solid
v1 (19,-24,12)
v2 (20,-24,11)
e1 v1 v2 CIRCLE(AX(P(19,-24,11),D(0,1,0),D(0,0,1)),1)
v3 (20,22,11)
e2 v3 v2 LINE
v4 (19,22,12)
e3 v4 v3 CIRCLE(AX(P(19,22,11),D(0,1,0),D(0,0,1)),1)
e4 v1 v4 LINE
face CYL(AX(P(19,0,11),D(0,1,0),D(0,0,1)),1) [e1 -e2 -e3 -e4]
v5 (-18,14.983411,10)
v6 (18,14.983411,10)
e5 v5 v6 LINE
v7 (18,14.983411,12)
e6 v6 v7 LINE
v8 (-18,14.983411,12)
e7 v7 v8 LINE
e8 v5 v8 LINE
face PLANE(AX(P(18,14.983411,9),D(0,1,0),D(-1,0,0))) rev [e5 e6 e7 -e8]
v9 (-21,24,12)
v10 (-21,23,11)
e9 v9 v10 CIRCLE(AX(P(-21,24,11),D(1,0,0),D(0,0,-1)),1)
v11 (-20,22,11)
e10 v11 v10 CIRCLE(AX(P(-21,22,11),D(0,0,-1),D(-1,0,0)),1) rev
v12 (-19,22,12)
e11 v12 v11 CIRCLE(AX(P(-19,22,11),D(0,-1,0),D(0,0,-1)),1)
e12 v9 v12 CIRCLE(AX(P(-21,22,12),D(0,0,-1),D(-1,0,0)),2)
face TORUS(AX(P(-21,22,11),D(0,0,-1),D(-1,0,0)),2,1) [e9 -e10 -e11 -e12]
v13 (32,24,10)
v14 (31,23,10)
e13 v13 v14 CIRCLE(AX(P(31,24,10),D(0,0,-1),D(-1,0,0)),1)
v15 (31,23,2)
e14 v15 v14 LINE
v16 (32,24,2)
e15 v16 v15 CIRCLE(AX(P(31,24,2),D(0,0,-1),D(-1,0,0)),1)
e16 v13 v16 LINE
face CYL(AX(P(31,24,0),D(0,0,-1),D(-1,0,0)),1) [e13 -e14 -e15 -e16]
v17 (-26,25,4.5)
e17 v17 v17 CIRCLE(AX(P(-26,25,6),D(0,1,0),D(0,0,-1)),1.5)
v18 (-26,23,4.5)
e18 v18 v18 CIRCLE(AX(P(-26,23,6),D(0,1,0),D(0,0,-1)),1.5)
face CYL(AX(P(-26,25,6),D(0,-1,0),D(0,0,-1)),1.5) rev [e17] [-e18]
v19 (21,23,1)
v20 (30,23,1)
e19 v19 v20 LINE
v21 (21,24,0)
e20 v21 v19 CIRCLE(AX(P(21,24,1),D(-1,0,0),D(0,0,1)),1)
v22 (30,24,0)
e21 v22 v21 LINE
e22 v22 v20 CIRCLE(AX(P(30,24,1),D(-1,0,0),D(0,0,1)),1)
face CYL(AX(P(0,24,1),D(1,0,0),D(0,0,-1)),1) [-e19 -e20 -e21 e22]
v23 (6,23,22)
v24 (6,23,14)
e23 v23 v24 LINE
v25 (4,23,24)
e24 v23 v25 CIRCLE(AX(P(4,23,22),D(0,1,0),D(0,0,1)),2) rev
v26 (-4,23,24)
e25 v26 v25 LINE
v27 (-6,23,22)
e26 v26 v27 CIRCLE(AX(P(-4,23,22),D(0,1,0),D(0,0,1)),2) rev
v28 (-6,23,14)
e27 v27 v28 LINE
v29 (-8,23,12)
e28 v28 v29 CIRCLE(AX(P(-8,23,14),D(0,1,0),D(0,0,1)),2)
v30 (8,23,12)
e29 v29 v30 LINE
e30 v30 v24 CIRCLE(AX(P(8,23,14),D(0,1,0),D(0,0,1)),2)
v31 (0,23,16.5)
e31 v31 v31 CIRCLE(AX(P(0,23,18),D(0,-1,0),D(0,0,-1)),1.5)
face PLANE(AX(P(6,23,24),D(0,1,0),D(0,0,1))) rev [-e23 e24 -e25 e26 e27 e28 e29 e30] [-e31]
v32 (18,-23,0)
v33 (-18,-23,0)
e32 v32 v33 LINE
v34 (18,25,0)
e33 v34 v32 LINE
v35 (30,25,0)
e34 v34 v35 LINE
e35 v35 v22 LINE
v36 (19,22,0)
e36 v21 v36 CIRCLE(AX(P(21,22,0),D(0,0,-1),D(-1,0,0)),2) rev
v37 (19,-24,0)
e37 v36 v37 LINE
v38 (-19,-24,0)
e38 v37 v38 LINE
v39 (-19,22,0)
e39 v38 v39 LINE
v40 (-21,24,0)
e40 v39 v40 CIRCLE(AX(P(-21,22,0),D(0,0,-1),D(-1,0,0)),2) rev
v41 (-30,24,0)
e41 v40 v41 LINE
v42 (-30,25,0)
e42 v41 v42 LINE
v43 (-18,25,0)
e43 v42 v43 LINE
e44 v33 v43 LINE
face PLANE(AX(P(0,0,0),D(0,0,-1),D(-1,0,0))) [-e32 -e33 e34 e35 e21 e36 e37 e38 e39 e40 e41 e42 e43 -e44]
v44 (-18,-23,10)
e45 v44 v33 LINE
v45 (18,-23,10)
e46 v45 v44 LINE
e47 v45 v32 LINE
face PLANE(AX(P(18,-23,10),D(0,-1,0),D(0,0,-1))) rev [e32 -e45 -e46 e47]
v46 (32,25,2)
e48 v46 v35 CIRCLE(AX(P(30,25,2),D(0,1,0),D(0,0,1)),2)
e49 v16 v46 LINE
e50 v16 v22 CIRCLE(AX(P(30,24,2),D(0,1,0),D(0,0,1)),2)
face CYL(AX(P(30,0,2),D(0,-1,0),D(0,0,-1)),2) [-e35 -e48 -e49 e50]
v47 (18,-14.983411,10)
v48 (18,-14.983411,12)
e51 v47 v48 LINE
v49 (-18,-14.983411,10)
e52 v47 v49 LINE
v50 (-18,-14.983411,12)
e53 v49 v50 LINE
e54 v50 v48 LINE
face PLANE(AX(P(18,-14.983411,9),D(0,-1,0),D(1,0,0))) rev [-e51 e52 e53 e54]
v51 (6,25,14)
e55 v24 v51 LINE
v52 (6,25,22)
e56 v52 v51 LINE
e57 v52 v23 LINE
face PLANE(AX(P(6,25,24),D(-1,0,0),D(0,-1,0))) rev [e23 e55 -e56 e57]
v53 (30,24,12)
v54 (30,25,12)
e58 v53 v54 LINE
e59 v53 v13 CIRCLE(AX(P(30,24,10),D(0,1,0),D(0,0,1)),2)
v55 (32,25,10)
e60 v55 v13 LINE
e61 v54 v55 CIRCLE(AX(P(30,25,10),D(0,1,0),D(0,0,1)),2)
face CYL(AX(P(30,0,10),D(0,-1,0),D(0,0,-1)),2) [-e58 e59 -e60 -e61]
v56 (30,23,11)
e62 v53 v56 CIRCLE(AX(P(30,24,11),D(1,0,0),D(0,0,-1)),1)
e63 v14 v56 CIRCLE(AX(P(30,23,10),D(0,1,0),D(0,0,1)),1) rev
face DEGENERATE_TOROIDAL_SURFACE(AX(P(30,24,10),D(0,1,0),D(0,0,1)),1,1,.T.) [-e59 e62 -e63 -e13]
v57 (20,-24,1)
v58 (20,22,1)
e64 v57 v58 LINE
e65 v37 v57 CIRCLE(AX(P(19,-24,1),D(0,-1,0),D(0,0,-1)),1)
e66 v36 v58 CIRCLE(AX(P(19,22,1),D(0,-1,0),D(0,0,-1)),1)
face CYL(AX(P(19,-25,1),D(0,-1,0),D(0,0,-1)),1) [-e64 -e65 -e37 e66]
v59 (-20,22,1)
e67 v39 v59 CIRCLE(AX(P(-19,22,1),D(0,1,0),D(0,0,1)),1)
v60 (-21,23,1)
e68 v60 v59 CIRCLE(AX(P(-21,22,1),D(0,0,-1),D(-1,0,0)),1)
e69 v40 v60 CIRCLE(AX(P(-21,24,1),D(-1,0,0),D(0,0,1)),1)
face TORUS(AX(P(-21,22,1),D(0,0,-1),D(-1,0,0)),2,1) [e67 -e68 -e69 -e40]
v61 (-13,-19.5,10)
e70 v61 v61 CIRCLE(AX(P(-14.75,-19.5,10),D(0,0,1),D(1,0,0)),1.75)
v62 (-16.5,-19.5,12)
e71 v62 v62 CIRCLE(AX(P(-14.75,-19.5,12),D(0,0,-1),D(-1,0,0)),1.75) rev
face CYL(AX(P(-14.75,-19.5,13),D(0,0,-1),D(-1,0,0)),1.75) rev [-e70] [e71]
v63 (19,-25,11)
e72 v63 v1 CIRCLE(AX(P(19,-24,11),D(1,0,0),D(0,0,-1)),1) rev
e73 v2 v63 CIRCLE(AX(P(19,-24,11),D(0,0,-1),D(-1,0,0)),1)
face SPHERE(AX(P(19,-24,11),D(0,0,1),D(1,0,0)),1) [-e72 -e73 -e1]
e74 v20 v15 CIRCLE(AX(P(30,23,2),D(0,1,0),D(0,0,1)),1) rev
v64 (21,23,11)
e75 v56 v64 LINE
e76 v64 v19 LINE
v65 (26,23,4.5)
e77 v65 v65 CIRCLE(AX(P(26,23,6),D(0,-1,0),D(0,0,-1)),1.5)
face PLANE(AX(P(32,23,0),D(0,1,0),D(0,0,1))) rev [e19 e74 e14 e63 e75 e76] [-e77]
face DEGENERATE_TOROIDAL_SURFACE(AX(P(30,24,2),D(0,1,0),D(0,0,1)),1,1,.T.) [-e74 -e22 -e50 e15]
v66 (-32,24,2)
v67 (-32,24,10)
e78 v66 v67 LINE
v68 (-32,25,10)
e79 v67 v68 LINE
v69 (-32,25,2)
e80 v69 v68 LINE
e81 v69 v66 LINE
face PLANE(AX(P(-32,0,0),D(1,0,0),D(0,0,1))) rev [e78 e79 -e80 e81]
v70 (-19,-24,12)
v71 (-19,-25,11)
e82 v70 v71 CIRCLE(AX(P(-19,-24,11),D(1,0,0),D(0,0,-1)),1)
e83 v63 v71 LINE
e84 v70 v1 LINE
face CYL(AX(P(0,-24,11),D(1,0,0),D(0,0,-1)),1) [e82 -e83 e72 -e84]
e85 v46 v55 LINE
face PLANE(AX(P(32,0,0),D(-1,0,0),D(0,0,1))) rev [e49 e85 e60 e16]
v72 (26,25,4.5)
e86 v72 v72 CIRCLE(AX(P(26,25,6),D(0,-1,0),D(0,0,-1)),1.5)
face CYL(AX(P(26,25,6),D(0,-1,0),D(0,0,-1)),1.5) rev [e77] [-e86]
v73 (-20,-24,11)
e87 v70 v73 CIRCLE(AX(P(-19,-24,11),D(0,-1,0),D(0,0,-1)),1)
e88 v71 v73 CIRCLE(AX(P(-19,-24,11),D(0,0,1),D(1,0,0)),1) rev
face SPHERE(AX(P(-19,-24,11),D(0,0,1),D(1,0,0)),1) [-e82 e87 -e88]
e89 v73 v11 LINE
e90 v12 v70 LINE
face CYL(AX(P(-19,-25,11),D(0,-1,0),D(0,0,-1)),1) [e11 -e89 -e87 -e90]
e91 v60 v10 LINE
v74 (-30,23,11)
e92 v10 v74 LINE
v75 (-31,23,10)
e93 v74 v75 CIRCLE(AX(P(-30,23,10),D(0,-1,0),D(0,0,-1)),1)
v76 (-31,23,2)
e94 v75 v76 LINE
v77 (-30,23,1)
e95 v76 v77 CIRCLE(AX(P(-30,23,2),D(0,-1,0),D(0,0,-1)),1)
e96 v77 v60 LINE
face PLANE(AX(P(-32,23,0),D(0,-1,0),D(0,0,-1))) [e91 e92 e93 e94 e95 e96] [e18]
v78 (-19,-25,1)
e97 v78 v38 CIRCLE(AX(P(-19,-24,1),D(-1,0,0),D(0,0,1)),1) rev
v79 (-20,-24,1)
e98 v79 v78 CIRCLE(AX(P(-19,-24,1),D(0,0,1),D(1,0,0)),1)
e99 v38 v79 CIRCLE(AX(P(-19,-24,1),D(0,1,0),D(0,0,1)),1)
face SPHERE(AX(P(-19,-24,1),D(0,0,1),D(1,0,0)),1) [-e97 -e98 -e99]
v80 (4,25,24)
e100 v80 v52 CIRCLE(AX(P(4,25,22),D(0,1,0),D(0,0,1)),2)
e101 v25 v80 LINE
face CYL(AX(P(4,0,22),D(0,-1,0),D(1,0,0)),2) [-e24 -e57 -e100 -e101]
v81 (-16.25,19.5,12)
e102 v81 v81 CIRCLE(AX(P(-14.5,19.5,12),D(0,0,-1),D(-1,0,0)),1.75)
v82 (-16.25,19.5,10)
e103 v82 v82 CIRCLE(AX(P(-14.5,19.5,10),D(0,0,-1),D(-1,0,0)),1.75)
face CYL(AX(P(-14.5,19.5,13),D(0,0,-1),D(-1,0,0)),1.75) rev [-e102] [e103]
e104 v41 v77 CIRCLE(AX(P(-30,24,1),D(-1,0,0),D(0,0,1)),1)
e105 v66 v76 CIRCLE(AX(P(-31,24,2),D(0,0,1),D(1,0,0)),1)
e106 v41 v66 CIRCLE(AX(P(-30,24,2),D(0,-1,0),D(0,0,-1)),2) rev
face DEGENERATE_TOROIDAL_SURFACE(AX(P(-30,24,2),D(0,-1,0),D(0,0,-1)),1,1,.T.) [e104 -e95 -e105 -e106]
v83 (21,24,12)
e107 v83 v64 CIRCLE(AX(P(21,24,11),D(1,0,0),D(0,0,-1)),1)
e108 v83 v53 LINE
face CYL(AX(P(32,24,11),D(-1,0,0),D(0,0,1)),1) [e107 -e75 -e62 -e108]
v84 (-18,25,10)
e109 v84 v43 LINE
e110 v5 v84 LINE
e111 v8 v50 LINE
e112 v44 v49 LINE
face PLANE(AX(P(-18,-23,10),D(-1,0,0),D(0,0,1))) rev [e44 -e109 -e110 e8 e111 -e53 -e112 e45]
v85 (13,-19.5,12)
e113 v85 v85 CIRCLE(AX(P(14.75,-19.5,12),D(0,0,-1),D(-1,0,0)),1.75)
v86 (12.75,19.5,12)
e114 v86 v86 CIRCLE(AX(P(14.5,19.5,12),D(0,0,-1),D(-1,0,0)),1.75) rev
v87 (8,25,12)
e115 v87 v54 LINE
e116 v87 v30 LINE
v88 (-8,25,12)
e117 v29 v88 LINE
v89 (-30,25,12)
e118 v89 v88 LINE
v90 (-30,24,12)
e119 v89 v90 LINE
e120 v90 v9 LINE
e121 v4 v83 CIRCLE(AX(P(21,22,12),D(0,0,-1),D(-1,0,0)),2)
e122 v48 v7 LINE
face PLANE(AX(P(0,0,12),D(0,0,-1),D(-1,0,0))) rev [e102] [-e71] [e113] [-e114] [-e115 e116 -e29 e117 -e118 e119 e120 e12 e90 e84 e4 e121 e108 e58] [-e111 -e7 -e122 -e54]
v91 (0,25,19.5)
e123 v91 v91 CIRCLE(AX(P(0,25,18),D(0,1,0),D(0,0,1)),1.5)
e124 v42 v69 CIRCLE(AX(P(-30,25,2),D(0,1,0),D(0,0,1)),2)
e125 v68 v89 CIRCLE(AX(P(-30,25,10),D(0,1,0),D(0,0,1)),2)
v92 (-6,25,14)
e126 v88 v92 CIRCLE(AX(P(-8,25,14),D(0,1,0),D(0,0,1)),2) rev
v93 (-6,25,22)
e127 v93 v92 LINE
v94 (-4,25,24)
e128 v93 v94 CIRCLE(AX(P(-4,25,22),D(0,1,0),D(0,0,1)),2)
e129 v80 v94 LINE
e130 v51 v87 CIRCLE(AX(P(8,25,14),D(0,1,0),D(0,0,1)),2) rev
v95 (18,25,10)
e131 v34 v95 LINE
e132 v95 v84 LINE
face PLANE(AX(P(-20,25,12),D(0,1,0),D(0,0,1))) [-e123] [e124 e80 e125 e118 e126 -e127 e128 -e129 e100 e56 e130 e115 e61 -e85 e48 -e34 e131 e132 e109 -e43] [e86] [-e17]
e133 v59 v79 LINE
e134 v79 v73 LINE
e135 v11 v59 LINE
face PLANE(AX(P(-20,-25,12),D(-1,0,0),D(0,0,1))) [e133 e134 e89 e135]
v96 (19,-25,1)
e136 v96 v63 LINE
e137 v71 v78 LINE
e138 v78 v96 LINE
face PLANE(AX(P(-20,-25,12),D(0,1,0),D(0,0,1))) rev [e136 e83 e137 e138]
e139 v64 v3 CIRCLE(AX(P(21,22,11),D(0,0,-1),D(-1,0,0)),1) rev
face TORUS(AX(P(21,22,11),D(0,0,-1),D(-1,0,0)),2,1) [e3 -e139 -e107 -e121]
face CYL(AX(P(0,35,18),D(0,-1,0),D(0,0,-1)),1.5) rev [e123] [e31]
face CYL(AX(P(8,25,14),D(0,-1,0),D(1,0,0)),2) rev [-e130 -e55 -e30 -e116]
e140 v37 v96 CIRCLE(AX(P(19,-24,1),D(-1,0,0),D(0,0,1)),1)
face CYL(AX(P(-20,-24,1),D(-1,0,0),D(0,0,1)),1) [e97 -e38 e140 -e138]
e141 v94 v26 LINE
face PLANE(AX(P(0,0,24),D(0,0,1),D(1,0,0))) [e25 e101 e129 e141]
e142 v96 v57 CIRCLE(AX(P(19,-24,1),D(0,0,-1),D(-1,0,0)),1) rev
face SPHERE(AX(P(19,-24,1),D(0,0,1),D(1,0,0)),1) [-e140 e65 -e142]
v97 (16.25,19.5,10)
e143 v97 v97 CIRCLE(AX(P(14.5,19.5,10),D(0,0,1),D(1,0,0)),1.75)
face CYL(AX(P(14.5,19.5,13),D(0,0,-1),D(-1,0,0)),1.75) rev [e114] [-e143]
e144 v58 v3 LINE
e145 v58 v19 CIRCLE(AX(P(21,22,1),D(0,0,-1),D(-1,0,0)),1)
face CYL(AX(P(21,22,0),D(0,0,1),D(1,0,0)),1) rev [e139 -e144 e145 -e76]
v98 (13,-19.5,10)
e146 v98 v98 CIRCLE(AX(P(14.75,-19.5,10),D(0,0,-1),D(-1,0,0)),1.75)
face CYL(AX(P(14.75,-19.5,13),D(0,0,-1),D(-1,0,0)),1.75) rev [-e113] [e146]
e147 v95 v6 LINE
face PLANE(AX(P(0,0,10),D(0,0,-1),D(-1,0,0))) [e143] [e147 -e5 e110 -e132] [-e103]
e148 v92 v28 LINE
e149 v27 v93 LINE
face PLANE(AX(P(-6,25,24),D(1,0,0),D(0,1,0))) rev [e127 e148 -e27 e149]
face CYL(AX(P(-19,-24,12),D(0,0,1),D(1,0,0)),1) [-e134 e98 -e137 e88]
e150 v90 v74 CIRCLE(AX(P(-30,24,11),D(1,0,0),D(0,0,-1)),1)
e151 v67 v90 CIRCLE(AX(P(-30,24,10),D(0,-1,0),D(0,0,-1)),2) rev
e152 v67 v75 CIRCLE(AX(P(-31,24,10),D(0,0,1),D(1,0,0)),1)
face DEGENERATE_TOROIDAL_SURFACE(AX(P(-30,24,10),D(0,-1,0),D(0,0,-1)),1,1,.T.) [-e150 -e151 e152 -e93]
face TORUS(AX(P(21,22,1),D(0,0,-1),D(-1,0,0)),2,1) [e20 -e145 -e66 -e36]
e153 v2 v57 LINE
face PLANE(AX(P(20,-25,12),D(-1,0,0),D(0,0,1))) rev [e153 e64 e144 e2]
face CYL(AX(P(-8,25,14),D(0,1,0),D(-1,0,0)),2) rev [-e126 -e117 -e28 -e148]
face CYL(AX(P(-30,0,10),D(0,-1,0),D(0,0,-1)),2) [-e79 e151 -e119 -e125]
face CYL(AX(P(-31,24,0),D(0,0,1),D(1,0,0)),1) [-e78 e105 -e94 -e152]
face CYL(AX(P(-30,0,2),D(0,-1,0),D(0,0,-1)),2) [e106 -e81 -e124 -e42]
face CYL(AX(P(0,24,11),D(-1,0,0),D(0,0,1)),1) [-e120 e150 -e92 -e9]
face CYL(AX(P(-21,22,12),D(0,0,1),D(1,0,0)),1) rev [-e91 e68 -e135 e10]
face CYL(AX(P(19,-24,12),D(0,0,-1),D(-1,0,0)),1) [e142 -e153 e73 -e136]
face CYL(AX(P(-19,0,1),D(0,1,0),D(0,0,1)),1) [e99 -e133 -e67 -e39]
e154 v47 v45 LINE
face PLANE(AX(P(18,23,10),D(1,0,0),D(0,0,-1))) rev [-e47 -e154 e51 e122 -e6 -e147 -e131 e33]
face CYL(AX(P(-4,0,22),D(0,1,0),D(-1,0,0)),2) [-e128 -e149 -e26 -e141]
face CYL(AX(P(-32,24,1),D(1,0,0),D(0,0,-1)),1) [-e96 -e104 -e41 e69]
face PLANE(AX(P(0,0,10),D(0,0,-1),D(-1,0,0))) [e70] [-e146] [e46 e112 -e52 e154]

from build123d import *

# Parameters (mm, degrees)
SKETCH_3_W           = 40
SKETCH_3_H           = 50
EXTRUDE_1_DEPTH      = 12
SKETCH_5_W           = 36
SKETCH_5_H           = 46
CUT_EXTRUDE_2_DEPTH  = 10
SKETCH_7_R           = 1.75
CUT_EXTRUDE_6_DEPTH  = 3
SKETCH_11_W          = 12
SKETCH_11_H          = 2
EXTRUDE_2_DEPTH      = 12
FILLET_1_R           = 2
SKETCH_13_R          = 1.5
CUT_EXTRUDE_7_DEPTH  = 2
FILLET_4_R           = 2
SKETCH_14_W          = 12
SKETCH_14_H          = 2
EXTRUDE_3_DEPTH      = 12
FILLET_5_R           = 2
SKETCH_15_R          = 1.5
CUT_EXTRUDE_8_DEPTH  = 12
FILLET_6_R           = 1
FILLET_7_R           = 1
SKETCH_16_W          = 36
SKETCH_16_H          = 10
CUT_EXTRUDE_9_DEPTH  = 63.481997407
SKETCH_19_W          = 36
SKETCH_19_H          = 29.966821032
CUT_EXTRUDE_10_DEPTH = 3


with BuildPart() as part:
    # 草图3 → 凸台-拉伸1 (new body)
    with BuildSketch(Plane.XY):
        Rectangle(SKETCH_3_W, SKETCH_3_H)
    extrude(amount=EXTRUDE_1_DEPTH)

    # 草图5 → 切除-拉伸2 (cut)
    with BuildSketch(Plane(origin=(0, 0, 0), x_dir=(-1, 0, 0), z_dir=(0, 0, -1))):
        Rectangle(SKETCH_5_W, SKETCH_5_H)
    extrude(amount=-CUT_EXTRUDE_2_DEPTH, mode=Mode.SUBTRACT)

    # 草图7 → 切除-拉伸6 (cut)
    with BuildSketch(Plane(origin=(0, 0, 10), x_dir=(-1, 0, 0), z_dir=(0, 0, -1))):
        with Locations((14.5, 19.5)):
            Circle(SKETCH_7_R)
        with Locations((14.75, -19.5)):
            Circle(SKETCH_7_R)
        with Locations((-14.75, -19.5)):
            Circle(SKETCH_7_R)
        with Locations((-14.5, 19.5)):
            Circle(SKETCH_7_R)
    extrude(amount=-CUT_EXTRUDE_6_DEPTH, mode=Mode.SUBTRACT)

    # 草图11 → 凸台-拉伸2 (add)
    with BuildSketch(Plane(origin=(20, 0, 0), x_dir=(0, 0, -1), z_dir=(1, 0, 0))):
        with Locations((-6, 24)):
            Rectangle(SKETCH_11_W, SKETCH_11_H)
    extrude_2 = extrude(amount=EXTRUDE_2_DEPTH)

    # 圆角1
    fillet_1_edges = [part.edges().sort_by_distance(p)[0] for p in [
        (32, 24, 0),
        (32, 24, 12),
    ]]
    fillet(fillet_1_edges, radius=FILLET_1_R)

    # 草图13 → 切除-拉伸7 (cut)
    with BuildSketch(Plane.XZ.offset(-23)):
        with Locations(Location((26, 6, 0), (0, 0, 270))):
            Circle(SKETCH_13_R)
    cut_extrude_7 = extrude(amount=-CUT_EXTRUDE_7_DEPTH, mode=Mode.SUBTRACT)

    # 镜向1: 凸台-拉伸2, 切除-拉伸7 across plane
    add(extrude_2.mirror(Plane(origin=(0, 0, 0), x_dir=(0, 0, 1), z_dir=(1, 0, 0))))
    add(cut_extrude_7.mirror(Plane(origin=(0, 0, 0), x_dir=(0, 0, 1), z_dir=(1, 0, 0))), mode=Mode.SUBTRACT)

    # 圆角4
    fillet_4_edges = [part.edges().sort_by_distance(p)[0] for p in [
        (-32, 24, 0),
        (-32, 24, 12),
    ]]
    fillet(fillet_4_edges, radius=FILLET_4_R)

    # 草图14 → 凸台-拉伸3 (add)
    with BuildSketch(Plane.XY.offset(12)):
        with Locations((0, 24)):
            Rectangle(SKETCH_14_W, SKETCH_14_H)
    extrude(amount=EXTRUDE_3_DEPTH)

    # 圆角5
    fillet_5_edges = [part.edges().sort_by_distance(p)[0] for p in [
        (6, 24, 12),
        (-6, 24, 12),
        (6, 24, 24),
        (-6, 24, 24),
    ]]
    fillet(fillet_5_edges, radius=FILLET_5_R)

    # 草图15 → 切除-拉伸8 (cut)
    with BuildSketch(Plane.XZ.offset(-23)):
        with Locations(Location((0, 18, 0), (0, 0, 270))):
            Circle(SKETCH_15_R)
    extrude(amount=-CUT_EXTRUDE_8_DEPTH, mode=Mode.SUBTRACT)

    # 圆角6
    fillet_6_edges = [part.edges().sort_by_distance(p)[0] for p in [
        (0, -25, 12),
        (0, -25, 0),
        (20, 23, 6),
        (-20, -25, 6),
        (20, -25, 6),
        (-20, 23, 6),
    ]]
    fillet(fillet_6_edges, radius=FILLET_6_R)

    # 圆角7
    # the kernel refuses this fillet: 1 mm, written as the material it takes off along each edge
    with BuildSketch(Plane(origin=(19, -24, 11), x_dir=(1, 0, 0), z_dir=(0, 0, 1))) as fillet_7_piece_1_section:
        Polygon((0, 0), (FILLET_7_R, 0), (FILLET_7_R, -FILLET_7_R), (0, -FILLET_7_R), align=None)
    fillet_7_piece_1 = extrude(amount=FILLET_7_R, mode=Mode.PRIVATE)
    fillet_7_piece_1 = fillet_7_piece_1 - Plane(origin=(19, -24, 11), x_dir=(-0.7071067811865475, 0.7071067811865475, 0), z_dir=(0, 0, 1)) * Sphere(FILLET_7_R, mode=Mode.PRIVATE)
    add(fillet_7_piece_1, mode=Mode.SUBTRACT)
    with BuildSketch(Plane(origin=(19, -24, 1), x_dir=(0, 0, -1), z_dir=(1, 0, 0))) as fillet_7_piece_2_section:
        Polygon((0, 0), (FILLET_7_R, 0), (FILLET_7_R, -FILLET_7_R), (0, -FILLET_7_R), align=None)
    fillet_7_piece_2 = extrude(amount=FILLET_7_R, mode=Mode.PRIVATE)
    fillet_7_piece_2 = fillet_7_piece_2 - Plane(origin=(19, -24, 1), x_dir=(0, 0.7071067811865475, 0.7071067811865475), z_dir=(1, 0, 0)) * Sphere(FILLET_7_R, mode=Mode.PRIVATE)
    add(fillet_7_piece_2, mode=Mode.SUBTRACT)
    with BuildSketch(Plane(origin=(-19, -24, 11), x_dir=(-1, 0, 0), z_dir=(0, 0, 1))) as fillet_7_piece_3_section:
        Polygon((0, 0), (FILLET_7_R, 0), (FILLET_7_R, FILLET_7_R), (0, FILLET_7_R), align=None)
    fillet_7_piece_3 = extrude(amount=FILLET_7_R, mode=Mode.PRIVATE)
    fillet_7_piece_3 = fillet_7_piece_3 - Plane(origin=(-19, -24, 11), x_dir=(0.7071067811865475, 0.7071067811865475, 0), z_dir=(0, 0, 1)) * Sphere(FILLET_7_R, mode=Mode.PRIVATE)
    add(fillet_7_piece_3, mode=Mode.SUBTRACT)
    with BuildSketch(Plane(origin=(-19, -24, 1), x_dir=(0, 0, -1), z_dir=(-1, 0, 0))) as fillet_7_piece_4_section:
        Polygon((0, 0), (FILLET_7_R, 0), (FILLET_7_R, FILLET_7_R), (0, FILLET_7_R), align=None)
    fillet_7_piece_4 = extrude(amount=FILLET_7_R, mode=Mode.PRIVATE)
    fillet_7_piece_4 = fillet_7_piece_4 - Plane(origin=(-19, -24, 1), x_dir=(0, 0.7071067811865475, 0.7071067811865475), z_dir=(-1, 0, 0)) * Sphere(FILLET_7_R, mode=Mode.PRIVATE)
    add(fillet_7_piece_4, mode=Mode.SUBTRACT)
    with BuildSketch(Plane(origin=(-32, 23, 10), x_dir=(1, 0, 0), z_dir=(0, 0, -1))) as fillet_7_piece_5:
        with BuildLine():
            CenterArc((FILLET_7_R, -FILLET_7_R), FILLET_7_R, 90, 90)
            Line((0, -FILLET_7_R), (0, 0))
            Line((0, 0), (FILLET_7_R, 0))
        make_face()
    extrude(amount=8, mode=Mode.SUBTRACT)
    with BuildSketch(Plane(origin=(-21, 23, 12), x_dir=(0, 1, 0), z_dir=(-1, 0, 0)), Plane(origin=(-21, 23, 0), x_dir=(0, 0, 1), z_dir=(-1, 0, 0))) as fillet_7_piece_6:
        with BuildLine():
            CenterArc((FILLET_7_R, FILLET_7_R), FILLET_7_R, 180, 90)
            Line((0, FILLET_7_R), (0, 0))
            Line((0, 0), (FILLET_7_R, 0))
        make_face()
    extrude(amount=9, mode=Mode.SUBTRACT)
    with BuildSketch(Plane(origin=(-30, 23, 10), x_dir=(0, 0, 1), z_dir=(1, 0, 0))) as fillet_7_piece_7:
        with BuildLine():
            CenterArc((2 - FILLET_7_R, -FILLET_7_R), FILLET_7_R, 0, 90)
            Line((2, -FILLET_7_R), (2, 0))
            Line((2, 0), (2 - FILLET_7_R, 0))
        make_face()
    revolve(axis=Axis((-30, 23, 10), (0, -1, 0)), revolution_arc=90, mode=Mode.SUBTRACT)
    with BuildSketch(Plane(origin=(-30, 23, 2), x_dir=(-1, 0, 0), z_dir=(0, 0, 1))) as fillet_7_piece_8:
        with BuildLine():
            CenterArc((2 - FILLET_7_R, -FILLET_7_R), FILLET_7_R, 0, 90)
            Line((2, -FILLET_7_R), (2, 0))
            Line((2, 0), (2 - FILLET_7_R, 0))
        make_face()
    revolve(axis=Axis((-30, 23, 2), (0, -1, 0)), revolution_arc=90, mode=Mode.SUBTRACT)
    with BuildSketch(Plane(origin=(-20, -24, 12), x_dir=(1, 0, 0), z_dir=(0, 1, 0)), Plane(origin=(-20, -24, 0), x_dir=(0, 0, 1), z_dir=(0, 1, 0)), Plane(origin=(20, 22, 12), x_dir=(-1, 0, 0), z_dir=(0, -1, 0)), Plane(origin=(20, 22, 0), x_dir=(0, 0, 1), z_dir=(0, -1, 0))) as fillet_7_piece_9:
        with BuildLine():
            CenterArc((FILLET_7_R, FILLET_7_R), FILLET_7_R, 180, 90)
            Line((0, FILLET_7_R), (0, 0))
            Line((0, 0), (FILLET_7_R, 0))
        make_face()
    extrude(amount=46, mode=Mode.SUBTRACT)
    with BuildSketch(Plane(origin=(-21, 22, 0), x_dir=(1, 0, 0), z_dir=(0, -1, 0))) as fillet_7_piece_10:
        with BuildLine():
            CenterArc((1 + FILLET_7_R, FILLET_7_R), FILLET_7_R, 180, 90)
            Line((1 + FILLET_7_R, 0), (1, 0))
            Line((1, 0), (1, FILLET_7_R))
        make_face()
    revolve(axis=Axis((-21, 22, 0), (0, 0, 1)), revolution_arc=90, mode=Mode.SUBTRACT)
    with BuildSketch(Plane(origin=(-21, 22, 12), x_dir=(1, 0, 0), z_dir=(0, -1, 0))) as fillet_7_piece_11:
        with BuildLine():
            CenterArc((1 + FILLET_7_R, -FILLET_7_R), FILLET_7_R, 90, 90)
            Line((1, -FILLET_7_R), (1, 0))
            Line((1, 0), (1 + FILLET_7_R, 0))
        make_face()
    revolve(axis=Axis((-21, 22, 12), (0, 0, 1)), revolution_arc=90, mode=Mode.SUBTRACT)
    with BuildSketch(Plane(origin=(21, 22, 0), x_dir=(0, 1, 0), z_dir=(1, 0, 0))) as fillet_7_piece_12:
        with BuildLine():
            CenterArc((1 + FILLET_7_R, FILLET_7_R), FILLET_7_R, 180, 90)
            Line((1 + FILLET_7_R, 0), (1, 0))
            Line((1, 0), (1, FILLET_7_R))
        make_face()
    revolve(axis=Axis((21, 22, 0), (0, 0, 1)), revolution_arc=90, mode=Mode.SUBTRACT)
    with BuildSketch(Plane(origin=(21, 22, 12), x_dir=(0, 1, 0), z_dir=(1, 0, 0))) as fillet_7_piece_13:
        with BuildLine():
            CenterArc((1 + FILLET_7_R, -FILLET_7_R), FILLET_7_R, 90, 90)
            Line((1, -FILLET_7_R), (1, 0))
            Line((1, 0), (1 + FILLET_7_R, 0))
        make_face()
    revolve(axis=Axis((21, 22, 12), (0, 0, 1)), revolution_arc=90, mode=Mode.SUBTRACT)
    with BuildSketch(Plane(origin=(32, 23, 10), x_dir=(-1, 0, 0), z_dir=(0, 0, -1))) as fillet_7_piece_14:
        with BuildLine():
            CenterArc((FILLET_7_R, FILLET_7_R), FILLET_7_R, 180, 90)
            Line((0, FILLET_7_R), (0, 0))
            Line((0, 0), (FILLET_7_R, 0))
        make_face()
    extrude(amount=8, mode=Mode.SUBTRACT)
    with BuildSketch(Plane(origin=(21, 23, 0), x_dir=(0, 0, 1), z_dir=(1, 0, 0)), Plane(origin=(21, 23, 12), x_dir=(0, 1, 0), z_dir=(1, 0, 0))) as fillet_7_piece_15:
        with BuildLine():
            CenterArc((FILLET_7_R, -FILLET_7_R), FILLET_7_R, 90, 90)
            Line((0, -FILLET_7_R), (0, 0))
            Line((0, 0), (FILLET_7_R, 0))
        make_face()
    extrude(amount=9, mode=Mode.SUBTRACT)
    with BuildSketch(Plane(origin=(30, 23, 2), x_dir=(0, 0, -1), z_dir=(-1, 0, 0))) as fillet_7_piece_16:
        with BuildLine():
            CenterArc((2 - FILLET_7_R, -FILLET_7_R), FILLET_7_R, 0, 90)
            Line((2, -FILLET_7_R), (2, 0))
            Line((2, 0), (2 - FILLET_7_R, 0))
        make_face()
    revolve(axis=Axis((30, 23, 2), (0, -1, 0)), revolution_arc=90, mode=Mode.SUBTRACT)
    with BuildSketch(Plane(origin=(30, 23, 10), x_dir=(1, 0, 0), z_dir=(0, 0, -1))) as fillet_7_piece_17:
        with BuildLine():
            CenterArc((2 - FILLET_7_R, -FILLET_7_R), FILLET_7_R, 0, 90)
            Line((2, -FILLET_7_R), (2, 0))
            Line((2, 0), (2 - FILLET_7_R, 0))
        make_face()
    revolve(axis=Axis((30, 23, 10), (0, -1, 0)), revolution_arc=90, mode=Mode.SUBTRACT)

    # 草图16 → 切除-拉伸9 (cut, through all)
    with BuildSketch(Plane(origin=(0, 23, 0), x_dir=(-1, 0, 0), z_dir=(0, -1, 0))):
        with Locations((0, -5)):
            Rectangle(SKETCH_16_W, SKETCH_16_H)
    extrude(amount=-CUT_EXTRUDE_9_DEPTH, mode=Mode.SUBTRACT)

    # 草图19 → 切除-拉伸10 (cut)
    with BuildSketch(Plane.XY.offset(12)):
        Rectangle(SKETCH_19_W, SKETCH_19_H)
    extrude(amount=-CUT_EXTRUDE_10_DEPTH, mode=Mode.SUBTRACT)


solid = part.part
